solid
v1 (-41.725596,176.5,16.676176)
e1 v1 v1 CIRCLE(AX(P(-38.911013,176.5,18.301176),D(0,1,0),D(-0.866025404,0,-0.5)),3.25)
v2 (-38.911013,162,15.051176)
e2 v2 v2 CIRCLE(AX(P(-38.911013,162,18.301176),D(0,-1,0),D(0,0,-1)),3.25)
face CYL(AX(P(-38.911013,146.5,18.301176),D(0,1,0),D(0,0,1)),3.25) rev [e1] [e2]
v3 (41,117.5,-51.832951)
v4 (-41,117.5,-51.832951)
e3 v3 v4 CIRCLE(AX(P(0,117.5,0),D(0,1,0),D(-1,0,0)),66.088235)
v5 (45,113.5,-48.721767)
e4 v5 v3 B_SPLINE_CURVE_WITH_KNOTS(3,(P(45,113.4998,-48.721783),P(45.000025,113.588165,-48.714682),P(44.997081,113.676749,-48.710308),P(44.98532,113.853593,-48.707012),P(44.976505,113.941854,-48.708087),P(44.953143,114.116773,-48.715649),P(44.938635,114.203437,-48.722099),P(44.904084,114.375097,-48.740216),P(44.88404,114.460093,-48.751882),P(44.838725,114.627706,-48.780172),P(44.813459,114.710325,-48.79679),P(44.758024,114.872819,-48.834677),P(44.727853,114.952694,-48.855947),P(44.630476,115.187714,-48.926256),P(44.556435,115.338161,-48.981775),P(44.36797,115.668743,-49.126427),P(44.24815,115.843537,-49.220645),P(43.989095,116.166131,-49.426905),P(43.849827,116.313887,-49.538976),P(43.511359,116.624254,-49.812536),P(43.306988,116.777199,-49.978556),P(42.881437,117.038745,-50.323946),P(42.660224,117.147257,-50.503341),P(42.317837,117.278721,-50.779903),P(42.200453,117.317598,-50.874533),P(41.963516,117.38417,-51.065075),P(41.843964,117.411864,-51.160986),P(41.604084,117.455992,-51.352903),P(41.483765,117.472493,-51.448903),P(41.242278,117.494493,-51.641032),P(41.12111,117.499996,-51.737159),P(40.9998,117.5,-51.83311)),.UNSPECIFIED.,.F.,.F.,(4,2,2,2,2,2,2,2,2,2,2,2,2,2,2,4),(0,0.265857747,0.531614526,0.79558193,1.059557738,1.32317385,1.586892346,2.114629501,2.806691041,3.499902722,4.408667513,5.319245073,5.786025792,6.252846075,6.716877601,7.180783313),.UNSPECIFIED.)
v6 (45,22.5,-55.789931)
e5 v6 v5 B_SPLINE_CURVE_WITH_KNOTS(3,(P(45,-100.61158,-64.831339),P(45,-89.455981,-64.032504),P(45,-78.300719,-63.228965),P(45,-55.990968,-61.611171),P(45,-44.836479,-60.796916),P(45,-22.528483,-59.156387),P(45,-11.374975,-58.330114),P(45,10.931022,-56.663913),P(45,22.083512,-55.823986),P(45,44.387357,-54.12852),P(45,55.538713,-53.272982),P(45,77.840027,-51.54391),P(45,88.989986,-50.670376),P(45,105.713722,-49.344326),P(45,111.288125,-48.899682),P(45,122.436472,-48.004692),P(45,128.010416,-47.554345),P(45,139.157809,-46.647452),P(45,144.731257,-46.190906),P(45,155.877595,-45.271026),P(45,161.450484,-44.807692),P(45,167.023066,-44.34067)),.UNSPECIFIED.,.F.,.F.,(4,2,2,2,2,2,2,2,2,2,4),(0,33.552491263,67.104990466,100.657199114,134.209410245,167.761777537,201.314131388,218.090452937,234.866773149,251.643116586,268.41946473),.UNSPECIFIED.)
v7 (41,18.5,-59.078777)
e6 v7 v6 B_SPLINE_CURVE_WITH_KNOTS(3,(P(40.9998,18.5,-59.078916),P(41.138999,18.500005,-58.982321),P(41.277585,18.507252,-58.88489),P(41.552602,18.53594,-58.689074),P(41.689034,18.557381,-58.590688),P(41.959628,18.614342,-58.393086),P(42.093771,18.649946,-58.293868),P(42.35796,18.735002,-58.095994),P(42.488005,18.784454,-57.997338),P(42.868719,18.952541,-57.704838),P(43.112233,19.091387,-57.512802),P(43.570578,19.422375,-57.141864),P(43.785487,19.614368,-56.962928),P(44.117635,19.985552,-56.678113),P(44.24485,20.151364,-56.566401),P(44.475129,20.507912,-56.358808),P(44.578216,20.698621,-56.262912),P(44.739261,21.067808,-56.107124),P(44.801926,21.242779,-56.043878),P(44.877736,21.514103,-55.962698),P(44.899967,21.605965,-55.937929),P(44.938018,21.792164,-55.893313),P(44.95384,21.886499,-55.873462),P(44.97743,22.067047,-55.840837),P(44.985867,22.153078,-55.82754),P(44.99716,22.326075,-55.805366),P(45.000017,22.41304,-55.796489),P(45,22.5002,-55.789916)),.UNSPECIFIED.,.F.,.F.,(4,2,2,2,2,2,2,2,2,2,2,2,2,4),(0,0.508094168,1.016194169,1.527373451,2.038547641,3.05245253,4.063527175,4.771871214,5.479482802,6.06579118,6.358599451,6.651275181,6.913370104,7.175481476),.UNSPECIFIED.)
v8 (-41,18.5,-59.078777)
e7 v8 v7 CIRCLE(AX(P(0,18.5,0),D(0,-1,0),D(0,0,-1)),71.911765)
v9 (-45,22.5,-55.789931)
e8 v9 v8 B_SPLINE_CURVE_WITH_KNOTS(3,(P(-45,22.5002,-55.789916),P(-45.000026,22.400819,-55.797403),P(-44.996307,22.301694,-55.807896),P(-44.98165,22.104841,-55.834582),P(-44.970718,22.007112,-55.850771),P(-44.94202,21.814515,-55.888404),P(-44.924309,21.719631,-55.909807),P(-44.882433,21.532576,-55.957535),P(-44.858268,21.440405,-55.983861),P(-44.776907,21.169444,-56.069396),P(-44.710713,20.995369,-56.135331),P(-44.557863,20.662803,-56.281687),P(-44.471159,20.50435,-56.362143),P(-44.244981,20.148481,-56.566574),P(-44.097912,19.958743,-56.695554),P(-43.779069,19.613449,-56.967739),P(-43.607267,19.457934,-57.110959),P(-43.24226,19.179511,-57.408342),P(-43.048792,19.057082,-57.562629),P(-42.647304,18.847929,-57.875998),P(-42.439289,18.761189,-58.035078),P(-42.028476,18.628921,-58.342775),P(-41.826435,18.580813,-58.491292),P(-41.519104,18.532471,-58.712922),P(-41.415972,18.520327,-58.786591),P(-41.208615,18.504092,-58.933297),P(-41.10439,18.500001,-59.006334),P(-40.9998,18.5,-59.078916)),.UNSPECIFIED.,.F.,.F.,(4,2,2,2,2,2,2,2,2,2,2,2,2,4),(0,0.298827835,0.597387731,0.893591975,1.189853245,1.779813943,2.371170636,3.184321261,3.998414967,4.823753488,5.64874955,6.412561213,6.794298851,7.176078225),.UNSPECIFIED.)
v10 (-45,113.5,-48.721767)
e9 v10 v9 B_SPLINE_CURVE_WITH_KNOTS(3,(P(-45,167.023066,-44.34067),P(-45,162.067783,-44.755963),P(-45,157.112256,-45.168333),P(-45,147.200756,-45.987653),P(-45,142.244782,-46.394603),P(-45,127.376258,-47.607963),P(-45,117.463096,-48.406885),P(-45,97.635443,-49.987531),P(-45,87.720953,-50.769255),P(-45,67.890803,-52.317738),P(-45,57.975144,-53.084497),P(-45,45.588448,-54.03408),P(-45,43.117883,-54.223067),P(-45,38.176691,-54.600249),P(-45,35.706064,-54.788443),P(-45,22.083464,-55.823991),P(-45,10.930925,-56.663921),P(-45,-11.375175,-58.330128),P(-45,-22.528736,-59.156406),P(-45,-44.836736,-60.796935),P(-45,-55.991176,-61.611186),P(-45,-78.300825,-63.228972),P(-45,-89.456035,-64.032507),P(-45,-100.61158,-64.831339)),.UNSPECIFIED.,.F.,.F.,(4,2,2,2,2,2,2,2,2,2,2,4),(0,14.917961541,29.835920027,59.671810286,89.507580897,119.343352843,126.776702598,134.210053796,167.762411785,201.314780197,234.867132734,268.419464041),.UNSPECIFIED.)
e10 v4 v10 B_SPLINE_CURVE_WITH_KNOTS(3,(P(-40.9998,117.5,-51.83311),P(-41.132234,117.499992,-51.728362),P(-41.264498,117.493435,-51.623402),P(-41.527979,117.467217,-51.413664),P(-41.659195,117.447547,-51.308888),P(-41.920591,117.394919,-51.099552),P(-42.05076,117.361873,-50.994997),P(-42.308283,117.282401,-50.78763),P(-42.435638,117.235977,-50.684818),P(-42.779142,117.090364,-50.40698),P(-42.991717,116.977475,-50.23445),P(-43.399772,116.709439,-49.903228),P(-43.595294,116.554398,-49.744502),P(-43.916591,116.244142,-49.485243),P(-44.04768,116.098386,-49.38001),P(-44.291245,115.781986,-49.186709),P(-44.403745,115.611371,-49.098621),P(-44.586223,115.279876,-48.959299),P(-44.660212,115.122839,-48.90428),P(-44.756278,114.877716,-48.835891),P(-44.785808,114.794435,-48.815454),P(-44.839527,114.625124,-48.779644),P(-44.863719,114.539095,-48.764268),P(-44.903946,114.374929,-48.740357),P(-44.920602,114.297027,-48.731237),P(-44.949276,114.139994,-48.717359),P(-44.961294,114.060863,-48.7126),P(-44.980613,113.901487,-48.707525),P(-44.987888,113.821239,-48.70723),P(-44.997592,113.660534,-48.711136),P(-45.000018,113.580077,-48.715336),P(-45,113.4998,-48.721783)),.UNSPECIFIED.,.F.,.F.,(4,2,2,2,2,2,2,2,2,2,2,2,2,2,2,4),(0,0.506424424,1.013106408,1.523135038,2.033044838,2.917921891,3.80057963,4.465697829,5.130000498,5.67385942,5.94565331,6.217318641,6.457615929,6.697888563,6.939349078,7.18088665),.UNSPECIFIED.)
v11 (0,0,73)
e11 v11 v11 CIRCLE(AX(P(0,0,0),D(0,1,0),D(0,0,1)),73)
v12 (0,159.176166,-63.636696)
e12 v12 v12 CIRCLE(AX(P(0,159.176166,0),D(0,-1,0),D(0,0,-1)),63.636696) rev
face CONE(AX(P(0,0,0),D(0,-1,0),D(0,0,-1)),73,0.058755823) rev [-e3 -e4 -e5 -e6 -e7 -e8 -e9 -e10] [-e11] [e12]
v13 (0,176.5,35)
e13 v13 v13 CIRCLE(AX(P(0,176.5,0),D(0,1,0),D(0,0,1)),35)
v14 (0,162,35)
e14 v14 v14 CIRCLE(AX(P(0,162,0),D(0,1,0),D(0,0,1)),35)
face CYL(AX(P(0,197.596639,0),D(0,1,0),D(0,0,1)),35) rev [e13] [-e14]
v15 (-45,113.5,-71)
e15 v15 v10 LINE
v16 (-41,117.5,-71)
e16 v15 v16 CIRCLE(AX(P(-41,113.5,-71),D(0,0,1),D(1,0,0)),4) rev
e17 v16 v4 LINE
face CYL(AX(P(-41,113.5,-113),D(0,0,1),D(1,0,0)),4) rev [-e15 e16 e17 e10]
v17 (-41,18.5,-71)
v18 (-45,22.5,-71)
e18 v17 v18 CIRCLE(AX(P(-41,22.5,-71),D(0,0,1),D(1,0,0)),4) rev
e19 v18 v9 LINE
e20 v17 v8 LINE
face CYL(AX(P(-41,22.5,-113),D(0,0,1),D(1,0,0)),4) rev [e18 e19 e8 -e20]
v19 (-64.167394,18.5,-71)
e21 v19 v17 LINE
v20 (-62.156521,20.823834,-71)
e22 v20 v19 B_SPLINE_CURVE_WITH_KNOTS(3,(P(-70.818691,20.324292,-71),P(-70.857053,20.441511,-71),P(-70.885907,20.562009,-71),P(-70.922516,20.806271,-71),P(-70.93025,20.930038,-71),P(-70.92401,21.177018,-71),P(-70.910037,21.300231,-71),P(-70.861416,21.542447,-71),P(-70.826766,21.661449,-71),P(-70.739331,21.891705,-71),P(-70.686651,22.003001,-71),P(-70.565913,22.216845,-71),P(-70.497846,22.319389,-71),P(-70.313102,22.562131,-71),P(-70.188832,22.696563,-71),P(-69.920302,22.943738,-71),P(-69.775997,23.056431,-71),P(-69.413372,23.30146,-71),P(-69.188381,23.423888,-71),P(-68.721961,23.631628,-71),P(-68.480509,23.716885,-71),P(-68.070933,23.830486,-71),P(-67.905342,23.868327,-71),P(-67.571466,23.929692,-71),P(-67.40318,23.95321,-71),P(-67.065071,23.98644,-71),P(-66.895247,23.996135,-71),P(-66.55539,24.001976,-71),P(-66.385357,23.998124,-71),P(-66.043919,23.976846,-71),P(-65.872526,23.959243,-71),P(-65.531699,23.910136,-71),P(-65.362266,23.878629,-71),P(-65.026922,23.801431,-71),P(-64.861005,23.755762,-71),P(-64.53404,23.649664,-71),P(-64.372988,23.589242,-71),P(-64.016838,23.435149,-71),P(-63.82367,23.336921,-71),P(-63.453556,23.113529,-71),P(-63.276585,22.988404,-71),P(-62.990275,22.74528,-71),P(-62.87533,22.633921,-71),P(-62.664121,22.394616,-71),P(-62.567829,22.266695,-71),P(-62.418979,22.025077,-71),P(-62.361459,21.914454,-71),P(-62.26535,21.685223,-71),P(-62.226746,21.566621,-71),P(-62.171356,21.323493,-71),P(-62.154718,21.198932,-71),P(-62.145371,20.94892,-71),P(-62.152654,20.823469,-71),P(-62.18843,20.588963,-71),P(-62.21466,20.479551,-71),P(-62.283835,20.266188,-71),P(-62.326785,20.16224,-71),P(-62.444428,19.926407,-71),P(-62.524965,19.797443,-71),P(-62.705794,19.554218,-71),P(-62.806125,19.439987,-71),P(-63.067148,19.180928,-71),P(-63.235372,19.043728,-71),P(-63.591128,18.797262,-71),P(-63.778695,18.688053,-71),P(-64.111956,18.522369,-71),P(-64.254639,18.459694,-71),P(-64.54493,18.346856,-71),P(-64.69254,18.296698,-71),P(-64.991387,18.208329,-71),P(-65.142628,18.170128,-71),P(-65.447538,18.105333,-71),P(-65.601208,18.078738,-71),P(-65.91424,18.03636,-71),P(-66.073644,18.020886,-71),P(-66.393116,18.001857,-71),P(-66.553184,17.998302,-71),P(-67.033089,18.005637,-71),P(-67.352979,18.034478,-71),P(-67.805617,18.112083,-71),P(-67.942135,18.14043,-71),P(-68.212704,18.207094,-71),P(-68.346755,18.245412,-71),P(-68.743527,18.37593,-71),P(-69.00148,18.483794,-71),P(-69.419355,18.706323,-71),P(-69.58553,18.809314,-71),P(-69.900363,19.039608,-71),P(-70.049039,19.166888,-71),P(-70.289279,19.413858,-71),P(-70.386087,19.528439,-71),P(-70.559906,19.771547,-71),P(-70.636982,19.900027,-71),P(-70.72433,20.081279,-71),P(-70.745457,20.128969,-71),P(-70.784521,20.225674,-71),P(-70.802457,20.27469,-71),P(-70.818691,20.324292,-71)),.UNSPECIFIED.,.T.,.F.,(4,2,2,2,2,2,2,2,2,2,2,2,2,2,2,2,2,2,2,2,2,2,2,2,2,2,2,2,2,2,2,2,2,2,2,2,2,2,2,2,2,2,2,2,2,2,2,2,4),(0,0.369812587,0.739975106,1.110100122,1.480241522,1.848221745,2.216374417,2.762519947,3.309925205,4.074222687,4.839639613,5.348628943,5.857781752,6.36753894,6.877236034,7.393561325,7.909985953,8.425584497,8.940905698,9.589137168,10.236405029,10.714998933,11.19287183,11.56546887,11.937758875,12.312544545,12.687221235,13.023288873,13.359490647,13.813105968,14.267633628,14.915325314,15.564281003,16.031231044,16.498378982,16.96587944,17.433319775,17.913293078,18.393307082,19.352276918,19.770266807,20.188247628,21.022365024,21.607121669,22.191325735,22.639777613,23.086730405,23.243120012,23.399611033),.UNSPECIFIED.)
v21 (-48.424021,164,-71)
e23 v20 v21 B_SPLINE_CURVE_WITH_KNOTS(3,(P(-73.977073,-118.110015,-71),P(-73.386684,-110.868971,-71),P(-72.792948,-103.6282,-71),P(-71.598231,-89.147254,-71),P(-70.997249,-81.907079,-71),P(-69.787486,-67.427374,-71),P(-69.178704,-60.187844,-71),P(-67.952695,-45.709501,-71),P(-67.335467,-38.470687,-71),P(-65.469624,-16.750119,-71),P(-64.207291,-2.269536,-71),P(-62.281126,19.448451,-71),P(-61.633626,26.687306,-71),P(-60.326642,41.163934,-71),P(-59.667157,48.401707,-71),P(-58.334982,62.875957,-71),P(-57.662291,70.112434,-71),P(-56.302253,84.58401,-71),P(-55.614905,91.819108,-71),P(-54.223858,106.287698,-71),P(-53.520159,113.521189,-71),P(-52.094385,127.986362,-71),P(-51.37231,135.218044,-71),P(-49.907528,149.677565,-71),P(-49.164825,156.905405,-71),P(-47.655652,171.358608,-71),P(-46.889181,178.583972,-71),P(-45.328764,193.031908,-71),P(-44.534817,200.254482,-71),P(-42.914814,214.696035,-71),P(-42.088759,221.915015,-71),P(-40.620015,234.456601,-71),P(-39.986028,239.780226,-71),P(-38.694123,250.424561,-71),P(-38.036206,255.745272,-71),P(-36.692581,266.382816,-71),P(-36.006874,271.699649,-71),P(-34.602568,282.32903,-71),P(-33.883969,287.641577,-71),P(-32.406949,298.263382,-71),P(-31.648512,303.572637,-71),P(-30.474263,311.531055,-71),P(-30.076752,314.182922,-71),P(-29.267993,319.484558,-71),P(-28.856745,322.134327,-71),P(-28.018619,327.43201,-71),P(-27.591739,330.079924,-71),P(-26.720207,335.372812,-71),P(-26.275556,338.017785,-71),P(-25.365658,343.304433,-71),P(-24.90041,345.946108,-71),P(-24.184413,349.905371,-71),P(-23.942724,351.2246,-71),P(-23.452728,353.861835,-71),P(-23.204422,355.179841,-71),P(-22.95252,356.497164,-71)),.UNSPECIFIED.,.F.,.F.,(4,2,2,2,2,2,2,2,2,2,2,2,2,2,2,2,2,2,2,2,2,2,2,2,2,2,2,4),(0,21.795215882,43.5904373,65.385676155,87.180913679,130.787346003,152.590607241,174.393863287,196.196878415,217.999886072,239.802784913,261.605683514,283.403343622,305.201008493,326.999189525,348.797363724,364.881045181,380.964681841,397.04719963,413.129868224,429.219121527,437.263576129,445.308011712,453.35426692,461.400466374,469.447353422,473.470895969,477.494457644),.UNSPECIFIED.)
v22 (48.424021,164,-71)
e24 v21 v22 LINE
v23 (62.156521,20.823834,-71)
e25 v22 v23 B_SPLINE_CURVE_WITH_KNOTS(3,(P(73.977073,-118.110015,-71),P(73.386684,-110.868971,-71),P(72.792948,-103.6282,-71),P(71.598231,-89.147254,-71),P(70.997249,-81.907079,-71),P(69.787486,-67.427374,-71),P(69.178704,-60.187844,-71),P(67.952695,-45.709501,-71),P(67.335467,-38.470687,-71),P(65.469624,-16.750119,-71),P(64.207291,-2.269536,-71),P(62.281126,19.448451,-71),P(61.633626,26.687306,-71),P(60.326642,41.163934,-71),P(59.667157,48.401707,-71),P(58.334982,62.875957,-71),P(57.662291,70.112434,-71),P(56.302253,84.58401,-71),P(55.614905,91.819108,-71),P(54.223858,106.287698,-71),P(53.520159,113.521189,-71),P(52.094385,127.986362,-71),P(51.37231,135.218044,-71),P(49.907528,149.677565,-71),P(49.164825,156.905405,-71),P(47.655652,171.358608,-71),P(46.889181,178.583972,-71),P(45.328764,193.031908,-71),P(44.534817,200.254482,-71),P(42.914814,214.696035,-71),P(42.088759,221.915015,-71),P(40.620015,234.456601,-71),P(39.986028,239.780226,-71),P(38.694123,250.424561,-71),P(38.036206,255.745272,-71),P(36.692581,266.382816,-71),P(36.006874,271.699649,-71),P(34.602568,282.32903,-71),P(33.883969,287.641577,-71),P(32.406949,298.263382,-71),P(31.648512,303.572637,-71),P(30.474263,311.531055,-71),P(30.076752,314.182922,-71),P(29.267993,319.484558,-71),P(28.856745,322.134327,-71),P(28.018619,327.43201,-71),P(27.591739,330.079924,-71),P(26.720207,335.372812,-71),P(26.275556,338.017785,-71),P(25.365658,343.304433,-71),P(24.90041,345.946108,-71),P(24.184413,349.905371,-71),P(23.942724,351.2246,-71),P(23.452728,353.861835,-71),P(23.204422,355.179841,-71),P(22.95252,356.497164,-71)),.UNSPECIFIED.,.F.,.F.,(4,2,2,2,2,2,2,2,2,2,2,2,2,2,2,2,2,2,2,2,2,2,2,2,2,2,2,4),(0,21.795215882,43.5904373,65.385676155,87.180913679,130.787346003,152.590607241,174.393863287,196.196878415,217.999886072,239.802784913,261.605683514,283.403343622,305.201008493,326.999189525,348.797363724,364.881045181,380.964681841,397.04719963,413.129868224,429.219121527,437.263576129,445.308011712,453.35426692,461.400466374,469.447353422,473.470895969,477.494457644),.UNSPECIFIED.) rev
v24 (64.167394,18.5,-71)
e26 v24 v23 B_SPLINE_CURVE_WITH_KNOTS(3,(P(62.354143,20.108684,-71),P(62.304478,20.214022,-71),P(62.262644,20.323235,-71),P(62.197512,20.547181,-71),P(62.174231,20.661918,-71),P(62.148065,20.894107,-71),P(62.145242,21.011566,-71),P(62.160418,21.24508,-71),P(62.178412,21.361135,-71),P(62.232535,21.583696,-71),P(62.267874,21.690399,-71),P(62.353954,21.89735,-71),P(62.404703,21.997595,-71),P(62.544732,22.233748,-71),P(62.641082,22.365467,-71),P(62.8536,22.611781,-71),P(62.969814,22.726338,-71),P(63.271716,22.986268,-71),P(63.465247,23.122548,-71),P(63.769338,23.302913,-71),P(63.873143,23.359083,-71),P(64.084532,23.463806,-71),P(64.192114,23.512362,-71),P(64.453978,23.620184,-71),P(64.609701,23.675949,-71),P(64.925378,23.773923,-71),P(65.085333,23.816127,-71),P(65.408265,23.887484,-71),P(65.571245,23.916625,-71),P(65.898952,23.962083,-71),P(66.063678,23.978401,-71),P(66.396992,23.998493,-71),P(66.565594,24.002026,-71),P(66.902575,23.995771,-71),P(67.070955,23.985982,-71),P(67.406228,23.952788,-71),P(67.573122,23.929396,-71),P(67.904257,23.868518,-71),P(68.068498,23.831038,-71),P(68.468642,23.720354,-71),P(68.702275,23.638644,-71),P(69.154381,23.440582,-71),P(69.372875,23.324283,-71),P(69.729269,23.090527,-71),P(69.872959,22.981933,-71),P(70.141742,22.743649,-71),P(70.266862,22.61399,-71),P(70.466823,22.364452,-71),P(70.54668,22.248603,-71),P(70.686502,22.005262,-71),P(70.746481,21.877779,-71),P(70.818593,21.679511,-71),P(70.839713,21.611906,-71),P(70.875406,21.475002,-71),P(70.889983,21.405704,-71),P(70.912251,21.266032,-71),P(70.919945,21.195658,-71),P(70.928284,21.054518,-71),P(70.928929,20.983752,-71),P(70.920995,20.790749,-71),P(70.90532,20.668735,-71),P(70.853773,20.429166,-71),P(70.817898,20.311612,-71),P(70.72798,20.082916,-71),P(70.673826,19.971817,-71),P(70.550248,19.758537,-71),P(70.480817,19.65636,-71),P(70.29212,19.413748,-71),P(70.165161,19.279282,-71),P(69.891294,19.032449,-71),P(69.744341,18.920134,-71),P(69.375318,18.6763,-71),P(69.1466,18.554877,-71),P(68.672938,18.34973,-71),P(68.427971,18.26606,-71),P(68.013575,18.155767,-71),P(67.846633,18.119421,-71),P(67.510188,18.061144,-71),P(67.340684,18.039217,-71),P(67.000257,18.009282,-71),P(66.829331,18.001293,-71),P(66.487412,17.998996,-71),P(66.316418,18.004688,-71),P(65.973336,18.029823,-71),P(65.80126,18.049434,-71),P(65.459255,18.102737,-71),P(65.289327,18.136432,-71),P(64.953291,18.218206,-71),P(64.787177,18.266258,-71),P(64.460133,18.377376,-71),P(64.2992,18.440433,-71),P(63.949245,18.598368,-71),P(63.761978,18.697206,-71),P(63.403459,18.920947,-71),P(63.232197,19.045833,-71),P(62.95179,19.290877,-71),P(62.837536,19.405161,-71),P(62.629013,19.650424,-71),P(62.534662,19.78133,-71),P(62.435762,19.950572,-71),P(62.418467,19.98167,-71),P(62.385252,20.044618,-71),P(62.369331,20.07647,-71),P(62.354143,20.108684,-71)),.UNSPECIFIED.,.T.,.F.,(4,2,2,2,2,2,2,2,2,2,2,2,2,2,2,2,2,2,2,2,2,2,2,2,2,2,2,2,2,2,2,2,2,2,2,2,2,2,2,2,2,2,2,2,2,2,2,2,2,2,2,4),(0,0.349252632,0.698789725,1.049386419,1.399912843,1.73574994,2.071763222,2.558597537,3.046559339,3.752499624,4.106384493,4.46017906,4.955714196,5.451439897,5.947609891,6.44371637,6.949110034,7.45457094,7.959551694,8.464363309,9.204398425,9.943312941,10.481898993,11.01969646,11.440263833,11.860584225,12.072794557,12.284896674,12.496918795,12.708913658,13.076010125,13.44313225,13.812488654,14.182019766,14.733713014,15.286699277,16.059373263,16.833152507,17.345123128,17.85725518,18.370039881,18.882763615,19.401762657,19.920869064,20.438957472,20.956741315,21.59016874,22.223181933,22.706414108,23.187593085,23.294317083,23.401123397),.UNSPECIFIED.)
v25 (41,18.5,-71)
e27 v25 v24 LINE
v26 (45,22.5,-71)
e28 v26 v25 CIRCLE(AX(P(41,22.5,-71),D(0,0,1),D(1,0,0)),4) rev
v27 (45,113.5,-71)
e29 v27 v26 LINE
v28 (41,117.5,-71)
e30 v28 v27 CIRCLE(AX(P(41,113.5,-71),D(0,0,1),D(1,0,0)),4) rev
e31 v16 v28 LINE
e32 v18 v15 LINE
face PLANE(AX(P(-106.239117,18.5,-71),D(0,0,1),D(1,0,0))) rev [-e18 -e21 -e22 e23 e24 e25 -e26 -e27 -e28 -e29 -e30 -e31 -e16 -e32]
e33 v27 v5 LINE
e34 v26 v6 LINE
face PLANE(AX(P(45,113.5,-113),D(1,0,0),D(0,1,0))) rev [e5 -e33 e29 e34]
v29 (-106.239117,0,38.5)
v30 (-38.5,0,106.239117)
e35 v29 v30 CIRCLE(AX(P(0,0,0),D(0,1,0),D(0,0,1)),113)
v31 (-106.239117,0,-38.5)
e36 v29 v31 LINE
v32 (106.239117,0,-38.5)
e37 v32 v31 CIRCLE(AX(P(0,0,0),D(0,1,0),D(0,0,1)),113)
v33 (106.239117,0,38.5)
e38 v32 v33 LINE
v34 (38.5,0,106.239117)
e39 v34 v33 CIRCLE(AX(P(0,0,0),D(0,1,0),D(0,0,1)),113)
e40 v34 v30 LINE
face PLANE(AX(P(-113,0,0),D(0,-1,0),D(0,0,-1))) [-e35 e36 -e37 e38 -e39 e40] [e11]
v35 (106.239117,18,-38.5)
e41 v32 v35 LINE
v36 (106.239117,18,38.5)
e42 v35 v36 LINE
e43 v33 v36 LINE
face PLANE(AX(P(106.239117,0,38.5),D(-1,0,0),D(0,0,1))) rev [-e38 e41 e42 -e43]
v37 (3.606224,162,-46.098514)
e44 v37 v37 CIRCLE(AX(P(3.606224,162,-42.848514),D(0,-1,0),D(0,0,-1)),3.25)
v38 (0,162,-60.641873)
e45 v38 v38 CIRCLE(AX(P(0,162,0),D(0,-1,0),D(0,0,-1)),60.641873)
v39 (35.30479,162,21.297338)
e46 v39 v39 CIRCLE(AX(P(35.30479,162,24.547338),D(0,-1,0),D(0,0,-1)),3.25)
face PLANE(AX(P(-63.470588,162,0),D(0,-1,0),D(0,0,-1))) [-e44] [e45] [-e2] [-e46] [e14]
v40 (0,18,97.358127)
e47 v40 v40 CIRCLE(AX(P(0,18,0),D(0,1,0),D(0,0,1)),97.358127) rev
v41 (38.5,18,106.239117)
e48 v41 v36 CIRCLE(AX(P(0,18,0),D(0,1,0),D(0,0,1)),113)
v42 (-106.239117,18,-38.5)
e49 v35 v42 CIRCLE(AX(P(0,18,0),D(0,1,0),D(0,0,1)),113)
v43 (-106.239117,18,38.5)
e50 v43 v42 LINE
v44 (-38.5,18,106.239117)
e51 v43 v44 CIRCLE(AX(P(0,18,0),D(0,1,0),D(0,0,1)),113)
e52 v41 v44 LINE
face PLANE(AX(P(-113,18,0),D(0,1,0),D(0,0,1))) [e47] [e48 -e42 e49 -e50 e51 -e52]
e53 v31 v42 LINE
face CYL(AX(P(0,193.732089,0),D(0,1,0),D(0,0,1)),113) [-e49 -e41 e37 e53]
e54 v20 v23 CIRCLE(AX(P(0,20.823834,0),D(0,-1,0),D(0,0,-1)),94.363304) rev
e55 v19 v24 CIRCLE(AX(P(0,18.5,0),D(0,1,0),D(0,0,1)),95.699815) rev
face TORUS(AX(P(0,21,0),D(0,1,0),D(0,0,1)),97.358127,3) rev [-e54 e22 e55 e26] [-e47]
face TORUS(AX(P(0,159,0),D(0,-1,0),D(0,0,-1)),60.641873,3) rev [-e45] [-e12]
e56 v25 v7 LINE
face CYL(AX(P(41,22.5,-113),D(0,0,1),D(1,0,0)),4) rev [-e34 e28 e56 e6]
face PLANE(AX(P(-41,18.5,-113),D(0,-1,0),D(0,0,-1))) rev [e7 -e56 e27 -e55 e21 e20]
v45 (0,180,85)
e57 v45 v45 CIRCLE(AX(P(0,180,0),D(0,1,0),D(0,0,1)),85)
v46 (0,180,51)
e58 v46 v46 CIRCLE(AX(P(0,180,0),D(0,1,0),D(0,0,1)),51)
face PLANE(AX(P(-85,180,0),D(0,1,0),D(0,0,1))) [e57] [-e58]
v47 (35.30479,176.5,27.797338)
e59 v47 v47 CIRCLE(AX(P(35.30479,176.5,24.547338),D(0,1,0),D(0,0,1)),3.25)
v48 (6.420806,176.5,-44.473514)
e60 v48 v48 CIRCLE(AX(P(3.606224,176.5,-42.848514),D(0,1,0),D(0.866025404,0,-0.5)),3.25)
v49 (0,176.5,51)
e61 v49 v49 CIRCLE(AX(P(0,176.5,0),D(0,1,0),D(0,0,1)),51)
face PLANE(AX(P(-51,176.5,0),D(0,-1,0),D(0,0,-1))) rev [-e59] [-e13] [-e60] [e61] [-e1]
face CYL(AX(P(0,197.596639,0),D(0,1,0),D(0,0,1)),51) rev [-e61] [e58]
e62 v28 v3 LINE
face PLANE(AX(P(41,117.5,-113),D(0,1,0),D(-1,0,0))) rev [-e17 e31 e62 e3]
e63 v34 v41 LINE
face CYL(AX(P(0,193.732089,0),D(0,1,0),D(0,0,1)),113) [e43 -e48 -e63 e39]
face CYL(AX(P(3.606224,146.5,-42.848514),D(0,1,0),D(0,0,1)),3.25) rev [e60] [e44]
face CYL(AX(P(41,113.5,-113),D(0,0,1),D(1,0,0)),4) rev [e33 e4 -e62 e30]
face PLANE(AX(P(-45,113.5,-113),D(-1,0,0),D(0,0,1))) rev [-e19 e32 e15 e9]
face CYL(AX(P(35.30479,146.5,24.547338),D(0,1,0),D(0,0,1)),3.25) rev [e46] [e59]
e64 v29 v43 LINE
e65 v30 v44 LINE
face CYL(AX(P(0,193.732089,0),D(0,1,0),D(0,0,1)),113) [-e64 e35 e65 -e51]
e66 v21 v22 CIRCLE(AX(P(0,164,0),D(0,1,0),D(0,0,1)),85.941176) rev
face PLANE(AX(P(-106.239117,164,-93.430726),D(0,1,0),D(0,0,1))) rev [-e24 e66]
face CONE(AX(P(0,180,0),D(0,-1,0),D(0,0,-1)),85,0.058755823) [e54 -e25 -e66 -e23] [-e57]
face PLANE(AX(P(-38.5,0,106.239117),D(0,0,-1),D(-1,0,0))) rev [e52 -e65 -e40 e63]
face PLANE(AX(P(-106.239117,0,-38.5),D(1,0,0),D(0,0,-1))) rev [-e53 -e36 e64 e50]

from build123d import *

# Parameters (mm, degrees)
CONG_1_R                     = 3
ESQUISSE2_W                  = 28.843575133
ESQUISSE2_H                  = 77
ESQUISSE2_W_2                = 77
ESQUISSE2_H_2                = 28.843575133
ENL_V_MAT_EXTRU_2_DEPTH      = 228.556586369
ENL_V_MAT_EXTRU_3_DEPTH      = 238.604187674
ENL_V_MAT_EXTRU_4_DEPTH      = 238.604187749
ENL_V_MAT_EXTRU_4_DEPTH_BACK = 238.604187749
ESQUISSE10_W                 = 22.430726153
ESQUISSE10_H                 = 145.5
PER_AGE1_START               = 162
PER_AGE1_OUTLINE_R           = 3.25
PER_AGE1_DEPTH               = 14.5
R_P_TITION_CIRCULAIRE1_COUNT = 3


# Read off the part's stored shape, not the designer's step: Perçage1
with BuildPart() as part:
    # Esquisse1 → Révolution1 (revolve)
    with BuildSketch(Plane.XY, mode=Mode.PRIVATE) as r_volution1_sk:
        Polygon((-113, 0), (-73, 0), (-63.470588237, 162), (0, 162), (0, 180), (-85, 180), (-94.529411763, 18), (-113, 18), align=None)
    revolve(r_volution1_sk.sketch.rotate(Axis((0, 193.73208918, 0), (0, -1, 0)), 270), axis=Axis((0, 193.73208918, 0), (0, -1, 0)))

    # Congé1
    cong_1_edges = [part.edges().sort_by_distance(p)[0] for p in [
        (0, 162, -63.470588237),
        (0, 18, -94.529411763),
    ]]
    fillet(cong_1_edges, radius=CONG_1_R)

    # Esquisse2 → Enlèv. mat.-Extru.2 (cut, through all)
    with BuildSketch(Plane(origin=(0, 18, 0), x_dir=(-1, 0, 0), z_dir=(0, 1, 0))):
        with Locations((120.660904657, 0)):
            Rectangle(ESQUISSE2_W, ESQUISSE2_H)
        with Locations((0, 120.660904657)):
            Rectangle(ESQUISSE2_W_2, ESQUISSE2_H_2)
        with Locations((-120.660904657, 0)):
            Rectangle(ESQUISSE2_W, ESQUISSE2_H)
    extrude(amount=-ENL_V_MAT_EXTRU_2_DEPTH, mode=Mode.SUBTRACT)

    # Esquisse5 → Enlèvement de matière-Révolution1 (revolve, cut)
    with BuildSketch(Plane.XY, mode=Mode.PRIVATE) as enl_vement_de_mati_re_r_volution1_sk:
        Polygon((-51, 180), (-51, 176.5), (-35, 176.5), (-35, 162), (0, 162), (0, 180), align=None)
    revolve(enl_vement_de_mati_re_r_volution1_sk.sketch.rotate(Axis((0, 197.596638655, 0), (0, -1, 0)), 90), axis=Axis((0, 197.596638655, 0), (0, -1, 0)), mode=Mode.SUBTRACT)

    # Esquisse9 → Enlèv. mat.-Extru.3 (cut, through all)
    with BuildSketch(Plane.XY):
        with BuildLine():
            Line((41, 117.5), (-41, 117.5))
            ThreePointArc((-41, 117.5), (-43.828427125, 116.328427125), (-45, 113.5))
            Line((-45, 113.5), (-45, 22.5))
            ThreePointArc((-45, 22.5), (-43.828427125, 19.671572875), (-41, 18.5))
            Line((-41, 18.5), (41, 18.5))
            ThreePointArc((41, 18.5), (43.828427125, 19.671572875), (45, 22.5))
            Line((45, 22.5), (45, 113.5))
            ThreePointArc((45, 113.5), (43.828427125, 116.328427125), (41, 117.5))
        make_face()
    extrude(amount=-ENL_V_MAT_EXTRU_3_DEPTH, mode=Mode.SUBTRACT)

    # Esquisse10 → Enlèv. mat.-Extru.4 (cut, two sides: drawn at the far end of the back side and taken through both)
    with BuildSketch(Plane(origin=(0, 0, 0), x_dir=(0, 0, -1), z_dir=(1, 0, 0)).offset(-ENL_V_MAT_EXTRU_4_DEPTH_BACK)):
        with Locations((82.215363077, 91.25)):
            Rectangle(ESQUISSE10_W, ESQUISSE10_H)
    extrude(amount=ENL_V_MAT_EXTRU_4_DEPTH + ENL_V_MAT_EXTRU_4_DEPTH_BACK, mode=Mode.SUBTRACT)

    # Perçage1 outline → Perçage1 (cut)
    with BuildSketch(Plane(origin=(0, 0, 0), x_dir=(1, 0, 0), z_dir=(0, 1, 0)).offset(PER_AGE1_START)):
        with Locations((35.304789832, -24.547338245)):
            Circle(PER_AGE1_OUTLINE_R)
    per_age1 = extrude(amount=PER_AGE1_DEPTH, mode=Mode.SUBTRACT)

    # Répétition circulaire1: Perçage1 ×3 about axis
    r_p_tition_circulaire1_axis = Axis((0, 0, 0), (0, 1, 0))
    for i in range(1, R_P_TITION_CIRCULAIRE1_COUNT):
        add(per_age1.rotate(r_p_tition_circulaire1_axis, i * 360 / R_P_TITION_CIRCULAIRE1_COUNT), mode=Mode.SUBTRACT)


solid = part.part
